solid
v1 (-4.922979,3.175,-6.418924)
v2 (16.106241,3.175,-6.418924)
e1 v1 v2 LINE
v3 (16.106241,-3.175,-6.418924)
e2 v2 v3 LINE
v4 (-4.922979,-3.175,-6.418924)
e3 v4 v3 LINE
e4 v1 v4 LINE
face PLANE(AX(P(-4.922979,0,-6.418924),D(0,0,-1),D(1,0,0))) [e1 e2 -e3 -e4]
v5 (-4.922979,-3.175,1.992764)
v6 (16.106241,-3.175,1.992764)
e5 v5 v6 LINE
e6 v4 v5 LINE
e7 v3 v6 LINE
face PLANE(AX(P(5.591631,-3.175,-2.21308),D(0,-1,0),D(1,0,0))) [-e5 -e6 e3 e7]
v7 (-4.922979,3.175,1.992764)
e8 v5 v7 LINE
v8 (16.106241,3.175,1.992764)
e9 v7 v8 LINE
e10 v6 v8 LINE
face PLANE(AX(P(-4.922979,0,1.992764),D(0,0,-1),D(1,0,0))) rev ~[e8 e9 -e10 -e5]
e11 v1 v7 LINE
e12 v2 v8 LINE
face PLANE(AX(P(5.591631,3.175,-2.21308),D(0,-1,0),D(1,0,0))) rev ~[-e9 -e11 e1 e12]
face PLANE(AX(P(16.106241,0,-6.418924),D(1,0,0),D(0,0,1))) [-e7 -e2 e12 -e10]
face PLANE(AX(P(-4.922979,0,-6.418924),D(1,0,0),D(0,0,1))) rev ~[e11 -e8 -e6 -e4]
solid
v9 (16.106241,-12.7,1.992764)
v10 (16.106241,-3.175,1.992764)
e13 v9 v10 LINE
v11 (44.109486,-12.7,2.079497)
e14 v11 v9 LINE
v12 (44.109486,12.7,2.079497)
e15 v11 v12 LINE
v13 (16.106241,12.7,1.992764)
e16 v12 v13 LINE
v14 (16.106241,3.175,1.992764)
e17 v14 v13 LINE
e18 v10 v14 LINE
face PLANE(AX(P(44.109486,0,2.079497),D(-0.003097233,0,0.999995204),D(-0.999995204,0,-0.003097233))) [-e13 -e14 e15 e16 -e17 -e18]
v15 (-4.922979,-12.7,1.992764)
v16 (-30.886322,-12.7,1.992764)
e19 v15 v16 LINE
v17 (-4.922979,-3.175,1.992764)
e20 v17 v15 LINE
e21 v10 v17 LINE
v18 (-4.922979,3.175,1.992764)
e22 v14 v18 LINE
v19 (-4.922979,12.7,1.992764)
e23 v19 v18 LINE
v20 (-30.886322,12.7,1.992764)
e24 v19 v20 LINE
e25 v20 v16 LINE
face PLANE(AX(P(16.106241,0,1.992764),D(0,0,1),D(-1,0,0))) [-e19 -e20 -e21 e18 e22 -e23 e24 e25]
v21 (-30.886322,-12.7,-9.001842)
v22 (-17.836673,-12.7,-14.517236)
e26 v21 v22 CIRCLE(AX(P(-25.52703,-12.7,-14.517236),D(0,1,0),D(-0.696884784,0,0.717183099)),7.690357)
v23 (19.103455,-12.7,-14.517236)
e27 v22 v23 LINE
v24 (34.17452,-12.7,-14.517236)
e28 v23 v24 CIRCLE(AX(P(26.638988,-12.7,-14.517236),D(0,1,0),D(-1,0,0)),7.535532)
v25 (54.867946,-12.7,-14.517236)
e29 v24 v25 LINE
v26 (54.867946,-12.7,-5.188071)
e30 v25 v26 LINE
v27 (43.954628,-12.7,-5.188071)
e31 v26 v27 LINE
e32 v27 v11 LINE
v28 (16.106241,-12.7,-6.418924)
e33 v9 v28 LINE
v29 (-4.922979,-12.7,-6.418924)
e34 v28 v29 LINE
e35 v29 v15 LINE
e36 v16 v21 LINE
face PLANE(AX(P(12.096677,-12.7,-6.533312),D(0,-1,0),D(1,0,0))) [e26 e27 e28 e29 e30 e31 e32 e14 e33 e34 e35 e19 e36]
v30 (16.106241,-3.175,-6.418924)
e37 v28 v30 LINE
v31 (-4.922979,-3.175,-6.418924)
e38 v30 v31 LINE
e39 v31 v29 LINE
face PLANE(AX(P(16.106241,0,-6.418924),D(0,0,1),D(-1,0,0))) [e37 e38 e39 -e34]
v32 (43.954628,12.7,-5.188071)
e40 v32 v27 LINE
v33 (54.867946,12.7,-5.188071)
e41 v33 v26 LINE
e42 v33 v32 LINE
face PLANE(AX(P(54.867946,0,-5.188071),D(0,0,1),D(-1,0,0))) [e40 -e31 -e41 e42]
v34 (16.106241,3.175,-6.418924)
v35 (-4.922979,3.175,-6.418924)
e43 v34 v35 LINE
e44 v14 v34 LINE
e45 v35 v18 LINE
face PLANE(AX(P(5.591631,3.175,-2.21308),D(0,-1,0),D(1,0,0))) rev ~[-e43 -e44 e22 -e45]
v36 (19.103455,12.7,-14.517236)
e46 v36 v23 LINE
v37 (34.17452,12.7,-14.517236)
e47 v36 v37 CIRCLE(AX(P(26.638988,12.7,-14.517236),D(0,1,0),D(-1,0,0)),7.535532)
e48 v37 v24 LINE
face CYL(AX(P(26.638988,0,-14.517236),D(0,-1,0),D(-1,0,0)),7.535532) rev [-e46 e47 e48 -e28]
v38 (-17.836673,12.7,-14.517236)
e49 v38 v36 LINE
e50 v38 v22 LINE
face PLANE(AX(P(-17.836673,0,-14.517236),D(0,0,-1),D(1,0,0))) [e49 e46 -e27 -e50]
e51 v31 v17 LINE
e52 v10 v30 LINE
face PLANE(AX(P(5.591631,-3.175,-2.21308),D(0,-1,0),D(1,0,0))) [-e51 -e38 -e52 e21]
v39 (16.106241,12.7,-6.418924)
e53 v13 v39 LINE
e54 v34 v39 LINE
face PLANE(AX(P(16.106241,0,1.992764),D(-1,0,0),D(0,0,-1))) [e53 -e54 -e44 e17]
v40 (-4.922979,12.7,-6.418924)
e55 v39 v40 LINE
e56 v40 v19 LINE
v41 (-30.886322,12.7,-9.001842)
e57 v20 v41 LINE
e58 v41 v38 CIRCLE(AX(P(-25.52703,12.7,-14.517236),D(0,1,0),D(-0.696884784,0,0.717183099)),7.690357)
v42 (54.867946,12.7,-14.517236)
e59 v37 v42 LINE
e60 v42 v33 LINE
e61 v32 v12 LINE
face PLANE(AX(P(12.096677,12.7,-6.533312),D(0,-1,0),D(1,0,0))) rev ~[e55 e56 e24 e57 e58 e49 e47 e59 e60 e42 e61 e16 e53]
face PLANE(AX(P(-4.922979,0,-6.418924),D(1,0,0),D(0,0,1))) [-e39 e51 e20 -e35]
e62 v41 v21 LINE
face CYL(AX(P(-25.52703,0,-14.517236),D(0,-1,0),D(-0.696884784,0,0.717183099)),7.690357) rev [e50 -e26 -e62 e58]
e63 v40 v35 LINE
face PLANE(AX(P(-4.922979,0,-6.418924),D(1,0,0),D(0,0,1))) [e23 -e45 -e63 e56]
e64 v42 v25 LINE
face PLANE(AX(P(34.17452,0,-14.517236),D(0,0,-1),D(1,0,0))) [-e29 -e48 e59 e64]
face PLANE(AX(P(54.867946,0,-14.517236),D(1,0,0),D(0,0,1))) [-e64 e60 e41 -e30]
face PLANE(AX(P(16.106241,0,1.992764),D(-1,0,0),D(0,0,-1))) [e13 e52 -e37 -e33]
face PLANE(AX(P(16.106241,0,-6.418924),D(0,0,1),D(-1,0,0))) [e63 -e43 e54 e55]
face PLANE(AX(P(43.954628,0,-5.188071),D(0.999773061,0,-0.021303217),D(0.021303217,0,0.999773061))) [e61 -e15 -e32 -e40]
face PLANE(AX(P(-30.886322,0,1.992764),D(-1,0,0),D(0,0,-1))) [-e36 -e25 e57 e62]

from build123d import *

# Parameters (mm, degrees)
F0_W     = 21.0292201075
F0_H     = 8.4116881791
F1_DEPTH = 3.175
F2_DEPTH = 12.7
F3_DEPTH = 12.7
F4_DEPTH = 12.7
F5_DEPTH = 3.175


# Not quite as in the source:
# - a length typed as a fraction of an inch, garbled in the dataset ("3 / 203.2 mm" for 3/8 in), is restored
# - the program builds the solid bodies; features that only make, move or delete a surface that nothing else refers to are left out


with BuildPart() as f1:
    # F0 (on Front) → F1 (new body, symmetric)
    with BuildSketch(Plane.XZ):
        with Locations((5.5916309617, -2.2130799996)):
            Rectangle(F0_W, F0_H)
        with BuildLine():
            Line((16.1062410154, -6.4189240892), (-4.9229790921, -6.4189240892))
            Line((-4.9229790921, -6.4189240892), (-4.9229790921, 1.9927640899))
            Line((-4.9229790921, 1.9927640899), (-22.6225737488, 1.9927640899))
            Line((-22.6225737488, 1.9927640899), (-30.8863221669, 1.9927640899))
            Line((-30.8863221669, 1.9927640899), (-30.8863221669, -9.0018421859))
            ThreePointArc((-30.8863221669, -9.0018421859), (-22.5331431268, -7.4335767863), (-17.836673191, -14.5172359101))
            Line((-17.836673191, -14.5172359101), (19.1034554321, -14.5172359101))
            ThreePointArc((19.1034554321, -14.5172359101), (26.6389876086, -6.9817037336), (34.174519785, -14.5172359101))
            Line((34.174519785, -14.5172359101), (48.1264702976, -14.5172359101))
            Line((48.1264702976, -14.5172359101), (54.8679456115, -14.5172359101))
            Line((54.8679456115, -14.5172359101), (54.8679456115, -5.1880707033))
            Line((54.8679456115, -5.1880707033), (43.9546283241, -5.1880707033))
            Line((43.9546283241, -5.1880707033), (44.1094860435, 2.0794970915))
            Line((44.1094860435, 2.0794970915), (16.1062410154, 1.9927640899))
            Line((16.1062410154, 1.9927640899), (16.1062410154, -6.4189240892))
        make_face()
    extrude(amount=F1_DEPTH, both=True)

    # F0 (on Front) → F2 (join, symmetric)
    with BuildSketch(Plane.XZ):
        with BuildLine():
            Line((16.1062410154, -6.4189240892), (-4.9229790921, -6.4189240892))
            Line((-4.9229790921, -6.4189240892), (-4.9229790921, 1.9927640899))
            Line((-4.9229790921, 1.9927640899), (-22.6225737488, 1.9927640899))
            Line((-22.6225737488, 1.9927640899), (-30.8863221669, 1.9927640899))
            Line((-30.8863221669, 1.9927640899), (-30.8863221669, -9.0018421859))
            ThreePointArc((-30.8863221669, -9.0018421859), (-22.5331431268, -7.4335767863), (-17.836673191, -14.5172359101))
            Line((-17.836673191, -14.5172359101), (19.1034554321, -14.5172359101))
            ThreePointArc((19.1034554321, -14.5172359101), (26.6389876086, -6.9817037336), (34.174519785, -14.5172359101))
            Line((34.174519785, -14.5172359101), (48.1264702976, -14.5172359101))
            Line((48.1264702976, -14.5172359101), (54.8679456115, -14.5172359101))
            Line((54.8679456115, -14.5172359101), (54.8679456115, -5.1880707033))
            Line((54.8679456115, -5.1880707033), (43.9546283241, -5.1880707033))
            Line((43.9546283241, -5.1880707033), (44.1094860435, 2.0794970915))
            Line((44.1094860435, 2.0794970915), (16.1062410154, 1.9927640899))
            Line((16.1062410154, 1.9927640899), (16.1062410154, -6.4189240892))
        make_face()
    extrude(amount=F2_DEPTH, both=True)

    # F0 (on Front) → F3 (join, symmetric)
    with BuildSketch(Plane.XZ):
        with BuildLine():
            Line((16.1062410154, -6.4189240892), (-4.9229790921, -6.4189240892))
            Line((-4.9229790921, -6.4189240892), (-4.9229790921, 1.9927640899))
            Line((-4.9229790921, 1.9927640899), (-22.6225737488, 1.9927640899))
            Line((-22.6225737488, 1.9927640899), (-30.8863221669, 1.9927640899))
            Line((-30.8863221669, 1.9927640899), (-30.8863221669, -9.0018421859))
            ThreePointArc((-30.8863221669, -9.0018421859), (-22.5331431268, -7.4335767863), (-17.836673191, -14.5172359101))
            Line((-17.836673191, -14.5172359101), (19.1034554321, -14.5172359101))
            ThreePointArc((19.1034554321, -14.5172359101), (26.6389876086, -6.9817037336), (34.174519785, -14.5172359101))
            Line((34.174519785, -14.5172359101), (48.1264702976, -14.5172359101))
            Line((48.1264702976, -14.5172359101), (54.8679456115, -14.5172359101))
            Line((54.8679456115, -14.5172359101), (54.8679456115, -5.1880707033))
            Line((54.8679456115, -5.1880707033), (43.9546283241, -5.1880707033))
            Line((43.9546283241, -5.1880707033), (44.1094860435, 2.0794970915))
            Line((44.1094860435, 2.0794970915), (16.1062410154, 1.9927640899))
            Line((16.1062410154, 1.9927640899), (16.1062410154, -6.4189240892))
        make_face()
    extrude(amount=F3_DEPTH, both=True)

    # F0 (on Front) → F4 (join, symmetric)
    with BuildSketch(Plane.XZ):
        with BuildLine():
            Line((16.1062410154, -6.4189240892), (-4.9229790921, -6.4189240892))
            Line((-4.9229790921, -6.4189240892), (-4.9229790921, 1.9927640899))
            Line((-4.9229790921, 1.9927640899), (-22.6225737488, 1.9927640899))
            Line((-22.6225737488, 1.9927640899), (-30.8863221669, 1.9927640899))
            Line((-30.8863221669, 1.9927640899), (-30.8863221669, -9.0018421859))
            ThreePointArc((-30.8863221669, -9.0018421859), (-22.5331431268, -7.4335767863), (-17.836673191, -14.5172359101))
            Line((-17.836673191, -14.5172359101), (19.1034554321, -14.5172359101))
            ThreePointArc((19.1034554321, -14.5172359101), (26.6389876086, -6.9817037336), (34.174519785, -14.5172359101))
            Line((34.174519785, -14.5172359101), (48.1264702976, -14.5172359101))
            Line((48.1264702976, -14.5172359101), (54.8679456115, -14.5172359101))
            Line((54.8679456115, -14.5172359101), (54.8679456115, -5.1880707033))
            Line((54.8679456115, -5.1880707033), (43.9546283241, -5.1880707033))
            Line((43.9546283241, -5.1880707033), (44.1094860435, 2.0794970915))
            Line((44.1094860435, 2.0794970915), (16.1062410154, 1.9927640899))
            Line((16.1062410154, 1.9927640899), (16.1062410154, -6.4189240892))
        make_face()
    extrude(amount=F4_DEPTH, both=True)


with BuildPart() as f5:
    # F0 (on Front) → F5 (new body, symmetric)
    with BuildSketch(Plane.XZ):
        with Locations((5.5916309617, -2.2130799996)):
            Rectangle(F0_W, F0_H)
    extrude(amount=F5_DEPTH, both=True)


solid = Compound([f1.part, f5.part])
